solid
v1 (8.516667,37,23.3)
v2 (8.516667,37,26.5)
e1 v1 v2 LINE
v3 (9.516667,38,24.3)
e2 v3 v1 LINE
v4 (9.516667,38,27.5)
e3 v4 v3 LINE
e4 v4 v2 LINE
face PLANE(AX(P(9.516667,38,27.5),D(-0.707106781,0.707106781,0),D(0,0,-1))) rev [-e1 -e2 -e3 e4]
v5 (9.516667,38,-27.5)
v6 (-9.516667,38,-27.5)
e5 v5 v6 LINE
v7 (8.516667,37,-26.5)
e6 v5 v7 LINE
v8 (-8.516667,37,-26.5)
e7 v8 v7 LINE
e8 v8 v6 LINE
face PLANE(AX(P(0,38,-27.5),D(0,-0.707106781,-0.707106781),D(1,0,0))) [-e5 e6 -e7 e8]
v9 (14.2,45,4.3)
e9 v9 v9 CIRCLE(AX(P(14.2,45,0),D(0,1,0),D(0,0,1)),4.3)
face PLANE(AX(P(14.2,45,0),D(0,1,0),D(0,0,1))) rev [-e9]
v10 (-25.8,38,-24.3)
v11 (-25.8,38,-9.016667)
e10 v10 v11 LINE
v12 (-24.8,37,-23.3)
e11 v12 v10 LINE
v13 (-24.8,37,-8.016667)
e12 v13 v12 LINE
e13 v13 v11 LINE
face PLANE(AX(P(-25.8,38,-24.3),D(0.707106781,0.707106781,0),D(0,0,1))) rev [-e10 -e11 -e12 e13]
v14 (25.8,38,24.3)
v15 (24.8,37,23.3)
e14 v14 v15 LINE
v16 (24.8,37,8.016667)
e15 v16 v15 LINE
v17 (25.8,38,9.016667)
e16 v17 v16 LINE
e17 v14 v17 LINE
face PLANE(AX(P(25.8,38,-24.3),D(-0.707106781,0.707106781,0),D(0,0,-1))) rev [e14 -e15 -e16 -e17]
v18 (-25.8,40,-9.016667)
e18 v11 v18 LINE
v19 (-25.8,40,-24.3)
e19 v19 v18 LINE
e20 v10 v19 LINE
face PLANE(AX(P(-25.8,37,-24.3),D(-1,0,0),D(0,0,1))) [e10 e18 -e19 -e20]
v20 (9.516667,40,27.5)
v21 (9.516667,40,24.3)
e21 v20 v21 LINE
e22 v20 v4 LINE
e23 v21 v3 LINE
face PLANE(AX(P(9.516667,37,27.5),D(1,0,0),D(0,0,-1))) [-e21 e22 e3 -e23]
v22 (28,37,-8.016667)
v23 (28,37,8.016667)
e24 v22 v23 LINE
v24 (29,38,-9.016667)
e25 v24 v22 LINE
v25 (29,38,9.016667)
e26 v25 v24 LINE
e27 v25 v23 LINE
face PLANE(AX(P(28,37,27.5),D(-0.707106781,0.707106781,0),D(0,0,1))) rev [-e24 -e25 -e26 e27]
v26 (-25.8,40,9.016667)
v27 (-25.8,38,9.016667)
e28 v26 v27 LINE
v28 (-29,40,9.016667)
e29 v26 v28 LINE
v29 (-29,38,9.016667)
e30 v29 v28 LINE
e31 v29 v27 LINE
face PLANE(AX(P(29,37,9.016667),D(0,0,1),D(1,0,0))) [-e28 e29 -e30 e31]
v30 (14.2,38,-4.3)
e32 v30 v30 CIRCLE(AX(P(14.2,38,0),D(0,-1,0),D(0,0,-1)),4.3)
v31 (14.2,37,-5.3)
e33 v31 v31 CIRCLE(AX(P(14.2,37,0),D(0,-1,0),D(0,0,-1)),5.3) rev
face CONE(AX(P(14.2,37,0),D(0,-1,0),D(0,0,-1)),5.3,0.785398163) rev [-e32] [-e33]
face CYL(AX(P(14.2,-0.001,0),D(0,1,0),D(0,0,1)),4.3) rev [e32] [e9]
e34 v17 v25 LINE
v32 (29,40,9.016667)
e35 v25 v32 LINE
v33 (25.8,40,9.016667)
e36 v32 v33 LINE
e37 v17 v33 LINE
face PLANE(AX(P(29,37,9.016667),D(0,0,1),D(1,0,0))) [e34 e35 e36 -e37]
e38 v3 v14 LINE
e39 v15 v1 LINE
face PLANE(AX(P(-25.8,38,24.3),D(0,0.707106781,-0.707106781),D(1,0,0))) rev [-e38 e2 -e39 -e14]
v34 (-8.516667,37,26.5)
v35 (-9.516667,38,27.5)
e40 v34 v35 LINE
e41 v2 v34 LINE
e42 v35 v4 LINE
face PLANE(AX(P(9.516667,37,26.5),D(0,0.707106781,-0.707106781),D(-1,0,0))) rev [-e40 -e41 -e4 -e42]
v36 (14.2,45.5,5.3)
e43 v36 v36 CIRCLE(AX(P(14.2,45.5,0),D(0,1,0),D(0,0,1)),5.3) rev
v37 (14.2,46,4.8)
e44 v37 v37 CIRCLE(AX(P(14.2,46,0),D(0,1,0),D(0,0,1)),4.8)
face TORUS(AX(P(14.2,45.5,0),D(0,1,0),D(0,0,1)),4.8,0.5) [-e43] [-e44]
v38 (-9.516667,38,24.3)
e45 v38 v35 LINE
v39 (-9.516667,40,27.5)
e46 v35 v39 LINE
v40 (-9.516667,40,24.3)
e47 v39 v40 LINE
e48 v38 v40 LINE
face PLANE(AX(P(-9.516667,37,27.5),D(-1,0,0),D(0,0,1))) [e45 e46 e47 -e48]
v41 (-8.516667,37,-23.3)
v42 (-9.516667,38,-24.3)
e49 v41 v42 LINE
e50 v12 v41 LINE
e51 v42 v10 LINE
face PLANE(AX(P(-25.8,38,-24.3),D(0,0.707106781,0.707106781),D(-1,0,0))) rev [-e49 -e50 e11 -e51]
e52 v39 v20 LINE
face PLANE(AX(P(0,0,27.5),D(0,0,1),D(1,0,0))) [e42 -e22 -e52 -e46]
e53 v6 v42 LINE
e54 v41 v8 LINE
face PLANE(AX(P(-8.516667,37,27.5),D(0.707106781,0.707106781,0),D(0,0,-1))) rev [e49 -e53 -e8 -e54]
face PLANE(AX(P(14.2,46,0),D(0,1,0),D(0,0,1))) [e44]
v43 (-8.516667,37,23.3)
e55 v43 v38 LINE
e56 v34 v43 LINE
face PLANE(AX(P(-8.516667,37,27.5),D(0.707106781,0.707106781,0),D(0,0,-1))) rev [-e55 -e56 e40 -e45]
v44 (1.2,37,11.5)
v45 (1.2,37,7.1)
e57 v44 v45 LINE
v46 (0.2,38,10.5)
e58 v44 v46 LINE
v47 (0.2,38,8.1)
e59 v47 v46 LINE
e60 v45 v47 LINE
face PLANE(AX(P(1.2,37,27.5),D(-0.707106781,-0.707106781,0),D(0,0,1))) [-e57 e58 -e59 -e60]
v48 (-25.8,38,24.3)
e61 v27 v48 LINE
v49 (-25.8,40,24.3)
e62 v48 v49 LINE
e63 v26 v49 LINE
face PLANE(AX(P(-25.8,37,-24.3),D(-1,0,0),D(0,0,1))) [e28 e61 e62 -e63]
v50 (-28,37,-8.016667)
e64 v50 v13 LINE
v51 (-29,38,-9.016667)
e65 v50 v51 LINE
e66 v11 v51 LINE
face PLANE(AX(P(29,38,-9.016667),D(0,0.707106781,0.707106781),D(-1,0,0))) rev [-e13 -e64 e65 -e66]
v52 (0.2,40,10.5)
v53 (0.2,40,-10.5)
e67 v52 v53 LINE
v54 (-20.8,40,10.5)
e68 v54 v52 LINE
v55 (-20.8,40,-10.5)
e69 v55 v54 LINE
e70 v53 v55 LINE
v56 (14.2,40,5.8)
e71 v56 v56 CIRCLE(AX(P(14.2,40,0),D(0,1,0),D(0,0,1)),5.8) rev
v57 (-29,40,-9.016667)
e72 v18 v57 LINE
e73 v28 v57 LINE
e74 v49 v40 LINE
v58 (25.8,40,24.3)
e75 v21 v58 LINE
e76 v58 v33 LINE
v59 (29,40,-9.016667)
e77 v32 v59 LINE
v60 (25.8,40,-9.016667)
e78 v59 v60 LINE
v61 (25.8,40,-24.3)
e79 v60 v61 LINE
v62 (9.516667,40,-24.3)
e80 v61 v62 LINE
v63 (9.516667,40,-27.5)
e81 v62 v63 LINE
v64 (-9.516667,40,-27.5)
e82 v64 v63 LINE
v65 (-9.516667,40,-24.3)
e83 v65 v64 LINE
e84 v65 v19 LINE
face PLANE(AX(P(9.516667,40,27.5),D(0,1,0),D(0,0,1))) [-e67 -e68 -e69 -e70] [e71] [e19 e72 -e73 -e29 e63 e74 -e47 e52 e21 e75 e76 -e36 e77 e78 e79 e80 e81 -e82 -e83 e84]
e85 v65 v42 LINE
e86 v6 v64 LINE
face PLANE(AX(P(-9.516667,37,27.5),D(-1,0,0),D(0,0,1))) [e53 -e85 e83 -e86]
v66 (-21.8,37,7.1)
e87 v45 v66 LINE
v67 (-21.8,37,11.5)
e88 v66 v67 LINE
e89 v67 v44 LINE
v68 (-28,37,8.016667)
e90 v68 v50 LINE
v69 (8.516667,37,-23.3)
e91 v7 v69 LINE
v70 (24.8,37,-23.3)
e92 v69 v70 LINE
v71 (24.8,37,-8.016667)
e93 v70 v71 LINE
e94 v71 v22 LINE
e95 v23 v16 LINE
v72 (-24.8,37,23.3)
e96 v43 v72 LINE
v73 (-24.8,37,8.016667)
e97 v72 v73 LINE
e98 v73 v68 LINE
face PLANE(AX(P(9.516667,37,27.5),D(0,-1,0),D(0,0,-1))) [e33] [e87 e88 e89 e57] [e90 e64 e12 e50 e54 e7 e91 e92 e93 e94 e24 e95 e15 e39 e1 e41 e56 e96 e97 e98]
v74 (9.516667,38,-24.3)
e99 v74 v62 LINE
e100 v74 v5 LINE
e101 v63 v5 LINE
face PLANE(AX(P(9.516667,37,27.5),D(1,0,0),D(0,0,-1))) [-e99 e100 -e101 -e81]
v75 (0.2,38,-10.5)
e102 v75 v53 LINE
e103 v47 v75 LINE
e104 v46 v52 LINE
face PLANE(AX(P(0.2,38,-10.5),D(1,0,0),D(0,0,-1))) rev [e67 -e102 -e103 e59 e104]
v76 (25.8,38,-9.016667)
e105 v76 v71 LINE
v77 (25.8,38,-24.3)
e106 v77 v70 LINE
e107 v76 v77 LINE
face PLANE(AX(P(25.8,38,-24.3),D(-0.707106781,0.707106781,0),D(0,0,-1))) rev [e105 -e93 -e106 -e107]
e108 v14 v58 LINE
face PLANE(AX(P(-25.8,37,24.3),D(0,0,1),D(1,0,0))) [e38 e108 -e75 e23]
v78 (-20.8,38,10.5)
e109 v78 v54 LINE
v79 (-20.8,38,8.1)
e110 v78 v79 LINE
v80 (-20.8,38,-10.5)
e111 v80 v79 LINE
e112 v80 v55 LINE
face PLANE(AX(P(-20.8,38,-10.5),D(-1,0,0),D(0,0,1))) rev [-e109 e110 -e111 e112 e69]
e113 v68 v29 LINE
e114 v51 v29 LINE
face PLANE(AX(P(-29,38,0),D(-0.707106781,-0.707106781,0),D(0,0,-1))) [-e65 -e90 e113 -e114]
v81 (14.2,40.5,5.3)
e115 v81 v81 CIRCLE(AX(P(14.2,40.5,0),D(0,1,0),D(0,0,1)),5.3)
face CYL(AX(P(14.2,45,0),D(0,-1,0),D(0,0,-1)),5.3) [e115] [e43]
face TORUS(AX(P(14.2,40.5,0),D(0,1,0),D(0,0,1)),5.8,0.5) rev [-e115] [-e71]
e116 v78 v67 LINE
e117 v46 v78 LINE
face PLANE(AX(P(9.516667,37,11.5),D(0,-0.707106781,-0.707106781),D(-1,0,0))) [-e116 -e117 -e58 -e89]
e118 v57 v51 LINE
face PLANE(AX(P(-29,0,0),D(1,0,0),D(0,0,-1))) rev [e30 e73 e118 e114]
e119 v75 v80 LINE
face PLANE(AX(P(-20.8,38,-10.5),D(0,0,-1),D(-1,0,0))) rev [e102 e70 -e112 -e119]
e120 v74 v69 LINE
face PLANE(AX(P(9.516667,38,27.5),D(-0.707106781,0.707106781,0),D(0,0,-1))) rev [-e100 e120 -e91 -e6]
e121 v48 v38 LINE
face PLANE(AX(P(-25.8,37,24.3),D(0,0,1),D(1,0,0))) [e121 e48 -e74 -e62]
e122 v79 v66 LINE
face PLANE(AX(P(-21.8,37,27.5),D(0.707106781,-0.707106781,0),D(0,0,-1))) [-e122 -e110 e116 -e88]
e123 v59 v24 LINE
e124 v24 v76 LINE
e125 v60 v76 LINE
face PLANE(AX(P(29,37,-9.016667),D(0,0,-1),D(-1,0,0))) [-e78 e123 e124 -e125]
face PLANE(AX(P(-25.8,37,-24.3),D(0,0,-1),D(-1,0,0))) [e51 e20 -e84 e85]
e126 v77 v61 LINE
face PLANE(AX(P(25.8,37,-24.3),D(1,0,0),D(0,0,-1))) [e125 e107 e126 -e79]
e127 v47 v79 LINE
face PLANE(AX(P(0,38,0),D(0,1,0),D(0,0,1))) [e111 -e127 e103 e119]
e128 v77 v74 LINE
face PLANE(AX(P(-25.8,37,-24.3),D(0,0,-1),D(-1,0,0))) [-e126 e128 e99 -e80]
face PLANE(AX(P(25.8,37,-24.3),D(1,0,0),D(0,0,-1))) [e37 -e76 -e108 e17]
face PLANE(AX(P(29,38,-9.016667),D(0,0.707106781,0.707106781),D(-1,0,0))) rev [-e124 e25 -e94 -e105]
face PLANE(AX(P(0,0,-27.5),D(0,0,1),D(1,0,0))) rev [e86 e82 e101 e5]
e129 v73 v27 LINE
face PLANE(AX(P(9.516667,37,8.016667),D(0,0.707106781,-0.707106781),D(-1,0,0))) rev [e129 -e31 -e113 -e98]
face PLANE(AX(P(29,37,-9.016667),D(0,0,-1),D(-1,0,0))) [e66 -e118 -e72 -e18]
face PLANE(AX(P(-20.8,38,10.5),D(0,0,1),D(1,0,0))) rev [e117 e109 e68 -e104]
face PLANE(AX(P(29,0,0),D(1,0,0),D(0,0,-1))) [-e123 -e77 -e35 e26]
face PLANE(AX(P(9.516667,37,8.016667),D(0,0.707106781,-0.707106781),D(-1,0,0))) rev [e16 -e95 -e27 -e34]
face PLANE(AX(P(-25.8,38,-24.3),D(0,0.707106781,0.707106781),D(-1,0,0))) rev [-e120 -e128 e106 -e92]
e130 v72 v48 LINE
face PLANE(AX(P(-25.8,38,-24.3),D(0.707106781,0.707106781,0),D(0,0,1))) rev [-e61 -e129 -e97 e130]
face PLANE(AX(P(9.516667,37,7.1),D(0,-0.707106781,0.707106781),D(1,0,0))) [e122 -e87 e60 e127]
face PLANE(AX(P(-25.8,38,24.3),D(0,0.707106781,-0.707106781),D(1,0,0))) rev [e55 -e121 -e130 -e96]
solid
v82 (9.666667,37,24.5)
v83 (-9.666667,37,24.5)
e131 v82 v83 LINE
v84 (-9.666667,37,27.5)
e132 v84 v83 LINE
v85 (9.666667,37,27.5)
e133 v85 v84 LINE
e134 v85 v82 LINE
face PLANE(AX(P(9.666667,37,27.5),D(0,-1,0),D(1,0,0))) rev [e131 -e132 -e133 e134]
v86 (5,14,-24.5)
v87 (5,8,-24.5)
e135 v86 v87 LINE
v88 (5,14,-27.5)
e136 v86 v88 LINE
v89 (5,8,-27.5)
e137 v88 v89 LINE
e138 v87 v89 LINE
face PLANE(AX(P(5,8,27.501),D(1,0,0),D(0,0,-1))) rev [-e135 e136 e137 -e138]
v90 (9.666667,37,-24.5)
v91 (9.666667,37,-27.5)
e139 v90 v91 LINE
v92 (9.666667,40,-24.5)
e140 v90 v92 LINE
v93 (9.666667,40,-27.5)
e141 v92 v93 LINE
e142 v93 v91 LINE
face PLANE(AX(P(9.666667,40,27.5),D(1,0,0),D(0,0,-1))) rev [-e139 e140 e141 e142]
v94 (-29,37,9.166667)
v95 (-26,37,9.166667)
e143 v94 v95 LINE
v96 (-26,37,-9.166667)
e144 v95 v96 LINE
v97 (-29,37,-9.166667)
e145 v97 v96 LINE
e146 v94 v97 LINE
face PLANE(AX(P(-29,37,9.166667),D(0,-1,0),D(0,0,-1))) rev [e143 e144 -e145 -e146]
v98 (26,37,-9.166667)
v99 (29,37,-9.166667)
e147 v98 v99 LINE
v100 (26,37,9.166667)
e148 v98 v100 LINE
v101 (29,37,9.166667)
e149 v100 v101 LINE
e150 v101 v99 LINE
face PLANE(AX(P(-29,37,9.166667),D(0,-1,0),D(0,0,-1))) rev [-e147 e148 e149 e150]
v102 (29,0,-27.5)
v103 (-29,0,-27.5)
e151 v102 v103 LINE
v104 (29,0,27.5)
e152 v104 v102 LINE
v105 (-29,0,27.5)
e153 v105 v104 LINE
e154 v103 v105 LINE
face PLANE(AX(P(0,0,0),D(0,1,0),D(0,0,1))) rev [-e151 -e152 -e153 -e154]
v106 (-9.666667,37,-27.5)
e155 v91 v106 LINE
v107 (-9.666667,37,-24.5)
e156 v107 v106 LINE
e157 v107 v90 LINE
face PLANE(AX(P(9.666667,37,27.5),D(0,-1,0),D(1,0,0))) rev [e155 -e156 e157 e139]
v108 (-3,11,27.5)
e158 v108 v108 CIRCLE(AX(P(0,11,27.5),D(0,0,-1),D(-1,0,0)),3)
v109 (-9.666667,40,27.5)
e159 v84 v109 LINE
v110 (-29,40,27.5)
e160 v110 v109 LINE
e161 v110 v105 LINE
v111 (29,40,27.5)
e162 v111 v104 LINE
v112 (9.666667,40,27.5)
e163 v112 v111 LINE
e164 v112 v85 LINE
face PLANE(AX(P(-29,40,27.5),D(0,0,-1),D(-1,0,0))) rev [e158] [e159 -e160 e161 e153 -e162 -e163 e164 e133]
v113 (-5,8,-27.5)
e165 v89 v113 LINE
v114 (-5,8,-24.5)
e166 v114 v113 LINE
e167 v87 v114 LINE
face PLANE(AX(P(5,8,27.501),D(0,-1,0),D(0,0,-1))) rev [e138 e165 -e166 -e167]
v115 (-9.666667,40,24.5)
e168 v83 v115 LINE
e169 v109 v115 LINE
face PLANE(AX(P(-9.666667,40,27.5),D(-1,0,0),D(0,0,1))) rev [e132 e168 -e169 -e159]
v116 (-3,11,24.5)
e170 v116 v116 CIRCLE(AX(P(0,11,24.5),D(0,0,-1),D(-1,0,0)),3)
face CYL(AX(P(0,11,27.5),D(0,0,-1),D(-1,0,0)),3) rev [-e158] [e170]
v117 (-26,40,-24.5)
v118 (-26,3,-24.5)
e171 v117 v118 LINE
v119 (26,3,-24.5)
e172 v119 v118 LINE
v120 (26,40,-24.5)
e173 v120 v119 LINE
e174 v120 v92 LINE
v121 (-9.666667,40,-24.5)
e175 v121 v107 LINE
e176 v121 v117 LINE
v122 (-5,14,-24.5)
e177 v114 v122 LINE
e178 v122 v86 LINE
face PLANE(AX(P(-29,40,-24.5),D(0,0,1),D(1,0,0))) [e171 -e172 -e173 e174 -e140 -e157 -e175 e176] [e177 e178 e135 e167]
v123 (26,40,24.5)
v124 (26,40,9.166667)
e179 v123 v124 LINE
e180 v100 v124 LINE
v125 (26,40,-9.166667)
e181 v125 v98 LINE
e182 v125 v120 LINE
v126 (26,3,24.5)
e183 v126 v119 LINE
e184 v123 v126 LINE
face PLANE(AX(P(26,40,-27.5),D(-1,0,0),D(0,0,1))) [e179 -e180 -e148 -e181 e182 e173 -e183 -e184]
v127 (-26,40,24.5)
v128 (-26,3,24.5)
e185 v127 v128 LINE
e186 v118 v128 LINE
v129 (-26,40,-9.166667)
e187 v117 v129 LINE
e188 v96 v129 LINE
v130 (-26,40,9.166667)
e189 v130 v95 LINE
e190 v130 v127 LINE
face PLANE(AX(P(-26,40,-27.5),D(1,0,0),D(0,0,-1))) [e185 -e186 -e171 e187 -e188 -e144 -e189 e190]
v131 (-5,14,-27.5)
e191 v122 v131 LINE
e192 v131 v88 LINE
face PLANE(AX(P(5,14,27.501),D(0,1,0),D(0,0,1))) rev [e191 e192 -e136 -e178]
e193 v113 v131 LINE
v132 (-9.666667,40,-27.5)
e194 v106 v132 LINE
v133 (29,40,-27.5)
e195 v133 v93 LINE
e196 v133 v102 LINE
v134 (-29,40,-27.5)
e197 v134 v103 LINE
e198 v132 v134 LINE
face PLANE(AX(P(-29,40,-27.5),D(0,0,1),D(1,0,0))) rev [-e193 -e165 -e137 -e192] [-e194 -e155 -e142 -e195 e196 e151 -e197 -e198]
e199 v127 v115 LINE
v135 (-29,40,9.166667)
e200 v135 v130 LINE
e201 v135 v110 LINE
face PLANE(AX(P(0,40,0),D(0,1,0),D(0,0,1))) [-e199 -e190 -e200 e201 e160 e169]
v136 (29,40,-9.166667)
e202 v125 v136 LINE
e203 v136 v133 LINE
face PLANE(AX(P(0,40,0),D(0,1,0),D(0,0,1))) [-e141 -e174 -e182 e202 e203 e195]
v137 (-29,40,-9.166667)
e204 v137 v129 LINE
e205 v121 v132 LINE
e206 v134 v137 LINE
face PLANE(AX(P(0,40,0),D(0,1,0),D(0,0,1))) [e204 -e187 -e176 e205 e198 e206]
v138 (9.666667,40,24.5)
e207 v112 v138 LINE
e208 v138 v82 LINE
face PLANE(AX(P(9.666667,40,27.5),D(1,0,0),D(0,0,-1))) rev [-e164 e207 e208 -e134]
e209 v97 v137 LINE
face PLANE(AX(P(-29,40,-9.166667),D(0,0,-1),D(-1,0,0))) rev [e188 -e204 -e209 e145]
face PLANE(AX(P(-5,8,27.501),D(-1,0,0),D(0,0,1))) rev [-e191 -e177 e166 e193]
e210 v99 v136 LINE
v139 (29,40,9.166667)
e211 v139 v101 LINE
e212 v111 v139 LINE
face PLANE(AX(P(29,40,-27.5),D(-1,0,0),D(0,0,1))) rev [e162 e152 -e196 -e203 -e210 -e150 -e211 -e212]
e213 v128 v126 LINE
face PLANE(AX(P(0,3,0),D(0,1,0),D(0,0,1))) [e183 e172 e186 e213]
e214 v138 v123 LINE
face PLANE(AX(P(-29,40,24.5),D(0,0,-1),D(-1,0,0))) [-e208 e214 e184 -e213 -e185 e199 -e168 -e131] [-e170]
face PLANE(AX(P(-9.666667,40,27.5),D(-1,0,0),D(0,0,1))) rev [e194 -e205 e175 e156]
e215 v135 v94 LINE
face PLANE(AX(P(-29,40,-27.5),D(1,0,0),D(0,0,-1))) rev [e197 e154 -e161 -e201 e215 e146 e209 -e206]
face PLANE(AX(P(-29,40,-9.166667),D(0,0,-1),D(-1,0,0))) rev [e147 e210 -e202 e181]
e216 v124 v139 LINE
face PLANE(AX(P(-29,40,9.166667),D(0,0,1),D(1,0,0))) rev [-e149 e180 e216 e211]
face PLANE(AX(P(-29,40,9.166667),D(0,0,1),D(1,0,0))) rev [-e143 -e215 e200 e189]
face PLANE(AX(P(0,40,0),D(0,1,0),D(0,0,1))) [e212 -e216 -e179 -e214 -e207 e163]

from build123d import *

# Parameters (mm, degrees)
SKETCH1_W           = 58
SKETCH1_H           = 55
BOSS_EXTRUDE1_DEPTH = 40
SHELL1_T            = -3
SKETCH2_W           = 18.333333334
SKETCH2_H           = 3
CUT_EXTRUDE1_DEPTH  = 76.632334355
SKETCH3_W           = 19.333333334
SKETCH3_H           = 3
CUT_EXTRUDE2_DEPTH  = 74.932401557
SKETCH4_W           = 19.033333334
SKETCH4_H           = 3
BOSS_EXTRUDE2_DEPTH = 55
BOSS_EXTRUDE3_START = -58
SKETCH5_W           = 18.033333334
SKETCH5_H           = 3
BOSS_EXTRUDE3_DEPTH = 58
SKETCH6_W           = 51.6
SKETCH6_H           = 48.6
BOSS_EXTRUDE4_DEPTH = 3
SKETCH7_W           = 21
SKETCH7_H           = 21
CUT_EXTRUDE3_DEPTH  = 2
SKETCH8_W           = 21
SKETCH8_H           = 2.4
CUT_EXTRUDE4_DEPTH  = 1
SKETCH9_R           = 4.3
CUT_EXTRUDE5_DEPTH  = 3
SKETCH10_W          = 10
SKETCH10_H          = 6
CUT_EXTRUDE6_DEPTH  = 3
SKETCH11_R          = 3
CUT_EXTRUDE7_DEPTH  = 72.728655362
SKETCH12_R          = 5.3
SKETCH12_R_2        = 4.3
BOSS_EXTRUDE5_DEPTH = 5
SKETCH13_R          = 5.3
BOSS_EXTRUDE6_DEPTH = 1
FILLET1_R           = 0.5
CHAMFER1_SIZE       = 1


with BuildPart() as part:
    # Sketch1 → Boss-Extrude1 (new body)
    with BuildSketch(Plane(origin=(0, 0, 0), x_dir=(1, 0, 0), z_dir=(0, 1, 0))):
        Rectangle(SKETCH1_W, SKETCH1_H)
    extrude(amount=BOSS_EXTRUDE1_DEPTH)

    # Shell1
    shell1_openings = [part.faces().sort_by_distance(p)[0] for p in [
        (0, 40, 0),
    ]]
    offset(amount=SHELL1_T, openings=shell1_openings, kind=Kind.INTERSECTION)

    # Sketch2 → Cut-Extrude1 (cut, through all)
    with BuildSketch(Plane(origin=(29, 0, 0), x_dir=(0, 0, -1), z_dir=(1, 0, 0))):
        with Locations((0, 38.5)):
            Rectangle(SKETCH2_W, SKETCH2_H)
    extrude(amount=-CUT_EXTRUDE1_DEPTH, mode=Mode.SUBTRACT)

    # Sketch3 → Cut-Extrude2 (cut, through all)
    with BuildSketch(Plane(origin=(0, 0, -27.5), x_dir=(-1, 0, 0), z_dir=(0, 0, -1))):
        with Locations((0, 38.5)):
            Rectangle(SKETCH3_W, SKETCH3_H)
    extrude(amount=-CUT_EXTRUDE2_DEPTH, mode=Mode.SUBTRACT)

    # Sketch10 → Cut-Extrude6 (cut)
    with BuildSketch(Plane(origin=(0, 0, -27.5), x_dir=(-1, 0, 0), z_dir=(0, 0, -1))):
        with Locations((0, 11)):
            Rectangle(SKETCH10_W, SKETCH10_H)
    extrude(amount=-CUT_EXTRUDE6_DEPTH, mode=Mode.SUBTRACT)

    # Sketch11 → Cut-Extrude7 (cut, through all)
    with BuildSketch(Plane(origin=(0, 0, 24.5), x_dir=(-1, 0, 0), z_dir=(0, 0, -1))):
        with Locations((0, 11)):
            Circle(SKETCH11_R)
    extrude(amount=-CUT_EXTRUDE7_DEPTH, mode=Mode.SUBTRACT)


with BuildPart() as body_2:
    # Sketch4 → Boss-Extrude2 (new, through all)
    with BuildSketch(Plane(origin=(0, 0, -27.5), x_dir=(-1, 0, 0), z_dir=(0, 0, -1))):
        with Locations((0, 38.5)):
            Rectangle(SKETCH4_W, SKETCH4_H)
    extrude(amount=-BOSS_EXTRUDE2_DEPTH)

    # Sketch5 → Boss-Extrude3 (add)
    with BuildSketch(Plane.ZY.offset(29).offset(BOSS_EXTRUDE3_START)):
        with Locations((0, 38.5)):
            Rectangle(SKETCH5_W, SKETCH5_H)
    extrude(amount=BOSS_EXTRUDE3_DEPTH)

    # Sketch6 → Boss-Extrude4 (add)
    with BuildSketch(Plane(origin=(0, 40, 0), x_dir=(1, 0, 0), z_dir=(0, 1, 0))):
        Rectangle(SKETCH6_W, SKETCH6_H)
    extrude(amount=-BOSS_EXTRUDE4_DEPTH)

    # Sketch7 → Cut-Extrude3 (cut)
    with BuildSketch(Plane(origin=(0, 40, 0), x_dir=(1, 0, 0), z_dir=(0, 1, 0))):
        with Locations((-10.3, 0)):
            Rectangle(SKETCH7_W, SKETCH7_H)
    extrude(amount=-CUT_EXTRUDE3_DEPTH, mode=Mode.SUBTRACT)

    # Sketch8 → Cut-Extrude4 (cut)
    with BuildSketch(Plane(origin=(0, 38, 0), x_dir=(1, 0, 0), z_dir=(0, 1, 0))):
        with Locations((-10.3, -9.3)):
            Rectangle(SKETCH8_W, SKETCH8_H)
    extrude(amount=-CUT_EXTRUDE4_DEPTH, mode=Mode.SUBTRACT)

    # Sketch9 → Cut-Extrude5 (cut)
    with BuildSketch(Plane(origin=(0, 40, 0), x_dir=(1, 0, 0), z_dir=(0, 1, 0))):
        with Locations(Location((14.2, 0, 0), (0, 0, 270))):
            Circle(SKETCH9_R)
    extrude(amount=-CUT_EXTRUDE5_DEPTH, mode=Mode.SUBTRACT)

    # Sketch12 → Boss-Extrude5 (add)
    with BuildSketch(Plane(origin=(0, 40, 0), x_dir=(1, 0, 0), z_dir=(0, 1, 0))):
        with Locations(Location((14.2, 0, 0), (0, 0, 270))):
            Circle(SKETCH12_R)
        with Locations(Location((14.2, 0, 0), (0, 0, 270))):
            Circle(SKETCH12_R_2, mode=Mode.SUBTRACT)
    extrude(amount=BOSS_EXTRUDE5_DEPTH)

    # Sketch13 → Boss-Extrude6 (add)
    with BuildSketch(Plane(origin=(0, 45, 0), x_dir=(1, 0, 0), z_dir=(0, 1, 0))):
        with Locations(Location((14.2, 0, 0), (0, 0, 270))):
            Circle(SKETCH13_R)
    extrude(amount=BOSS_EXTRUDE6_DEPTH)

    # Fillet1
    fillet1_edges = [body_2.edges().sort_by_distance(p)[0] for p in [
        (14.2, 40, -5.3),
        (14.2, 46, -5.3),
    ]]
    fillet(fillet1_edges, radius=FILLET1_R)

    # Chamfer1
    chamfer1_edges = [body_2.edges().sort_by_distance(p)[0] for p in [
        (0, 37, -27.5),
        (-9.516666667, 37, -25.9),
        (-17.658333333, 37, -24.3),
        (-25.8, 37, -16.658333333),
        (-27.4, 37, -9.016666667),
        (-29, 37, 0),
        (-27.4, 37, 9.016666667),
        (-25.8, 37, 16.658333333),
        (-17.658333333, 37, 24.3),
        (-9.516666667, 37, 25.9),
        (0, 37, 27.5),
        (9.516666667, 37, 25.9),
        (17.658333333, 37, 24.3),
        (25.8, 37, 16.658333333),
        (27.4, 37, 9.016666667),
        (29, 37, 0),
        (27.4, 37, -9.016666667),
        (25.8, 37, -16.658333333),
        (17.658333333, 37, -24.3),
        (9.516666667, 37, -25.9),
        (-10.3, 37, 8.1),
        (0.2, 37, 9.3),
        (-10.3, 37, 10.5),
        (-20.8, 37, 9.3),
        (14.2, 37, -4.3),
    ]]
    chamfer(chamfer1_edges, length=CHAMFER1_SIZE - 0.0001)  # a hair under: the kernel refuses the full size


solid = Compound([part.part, body_2.part])
